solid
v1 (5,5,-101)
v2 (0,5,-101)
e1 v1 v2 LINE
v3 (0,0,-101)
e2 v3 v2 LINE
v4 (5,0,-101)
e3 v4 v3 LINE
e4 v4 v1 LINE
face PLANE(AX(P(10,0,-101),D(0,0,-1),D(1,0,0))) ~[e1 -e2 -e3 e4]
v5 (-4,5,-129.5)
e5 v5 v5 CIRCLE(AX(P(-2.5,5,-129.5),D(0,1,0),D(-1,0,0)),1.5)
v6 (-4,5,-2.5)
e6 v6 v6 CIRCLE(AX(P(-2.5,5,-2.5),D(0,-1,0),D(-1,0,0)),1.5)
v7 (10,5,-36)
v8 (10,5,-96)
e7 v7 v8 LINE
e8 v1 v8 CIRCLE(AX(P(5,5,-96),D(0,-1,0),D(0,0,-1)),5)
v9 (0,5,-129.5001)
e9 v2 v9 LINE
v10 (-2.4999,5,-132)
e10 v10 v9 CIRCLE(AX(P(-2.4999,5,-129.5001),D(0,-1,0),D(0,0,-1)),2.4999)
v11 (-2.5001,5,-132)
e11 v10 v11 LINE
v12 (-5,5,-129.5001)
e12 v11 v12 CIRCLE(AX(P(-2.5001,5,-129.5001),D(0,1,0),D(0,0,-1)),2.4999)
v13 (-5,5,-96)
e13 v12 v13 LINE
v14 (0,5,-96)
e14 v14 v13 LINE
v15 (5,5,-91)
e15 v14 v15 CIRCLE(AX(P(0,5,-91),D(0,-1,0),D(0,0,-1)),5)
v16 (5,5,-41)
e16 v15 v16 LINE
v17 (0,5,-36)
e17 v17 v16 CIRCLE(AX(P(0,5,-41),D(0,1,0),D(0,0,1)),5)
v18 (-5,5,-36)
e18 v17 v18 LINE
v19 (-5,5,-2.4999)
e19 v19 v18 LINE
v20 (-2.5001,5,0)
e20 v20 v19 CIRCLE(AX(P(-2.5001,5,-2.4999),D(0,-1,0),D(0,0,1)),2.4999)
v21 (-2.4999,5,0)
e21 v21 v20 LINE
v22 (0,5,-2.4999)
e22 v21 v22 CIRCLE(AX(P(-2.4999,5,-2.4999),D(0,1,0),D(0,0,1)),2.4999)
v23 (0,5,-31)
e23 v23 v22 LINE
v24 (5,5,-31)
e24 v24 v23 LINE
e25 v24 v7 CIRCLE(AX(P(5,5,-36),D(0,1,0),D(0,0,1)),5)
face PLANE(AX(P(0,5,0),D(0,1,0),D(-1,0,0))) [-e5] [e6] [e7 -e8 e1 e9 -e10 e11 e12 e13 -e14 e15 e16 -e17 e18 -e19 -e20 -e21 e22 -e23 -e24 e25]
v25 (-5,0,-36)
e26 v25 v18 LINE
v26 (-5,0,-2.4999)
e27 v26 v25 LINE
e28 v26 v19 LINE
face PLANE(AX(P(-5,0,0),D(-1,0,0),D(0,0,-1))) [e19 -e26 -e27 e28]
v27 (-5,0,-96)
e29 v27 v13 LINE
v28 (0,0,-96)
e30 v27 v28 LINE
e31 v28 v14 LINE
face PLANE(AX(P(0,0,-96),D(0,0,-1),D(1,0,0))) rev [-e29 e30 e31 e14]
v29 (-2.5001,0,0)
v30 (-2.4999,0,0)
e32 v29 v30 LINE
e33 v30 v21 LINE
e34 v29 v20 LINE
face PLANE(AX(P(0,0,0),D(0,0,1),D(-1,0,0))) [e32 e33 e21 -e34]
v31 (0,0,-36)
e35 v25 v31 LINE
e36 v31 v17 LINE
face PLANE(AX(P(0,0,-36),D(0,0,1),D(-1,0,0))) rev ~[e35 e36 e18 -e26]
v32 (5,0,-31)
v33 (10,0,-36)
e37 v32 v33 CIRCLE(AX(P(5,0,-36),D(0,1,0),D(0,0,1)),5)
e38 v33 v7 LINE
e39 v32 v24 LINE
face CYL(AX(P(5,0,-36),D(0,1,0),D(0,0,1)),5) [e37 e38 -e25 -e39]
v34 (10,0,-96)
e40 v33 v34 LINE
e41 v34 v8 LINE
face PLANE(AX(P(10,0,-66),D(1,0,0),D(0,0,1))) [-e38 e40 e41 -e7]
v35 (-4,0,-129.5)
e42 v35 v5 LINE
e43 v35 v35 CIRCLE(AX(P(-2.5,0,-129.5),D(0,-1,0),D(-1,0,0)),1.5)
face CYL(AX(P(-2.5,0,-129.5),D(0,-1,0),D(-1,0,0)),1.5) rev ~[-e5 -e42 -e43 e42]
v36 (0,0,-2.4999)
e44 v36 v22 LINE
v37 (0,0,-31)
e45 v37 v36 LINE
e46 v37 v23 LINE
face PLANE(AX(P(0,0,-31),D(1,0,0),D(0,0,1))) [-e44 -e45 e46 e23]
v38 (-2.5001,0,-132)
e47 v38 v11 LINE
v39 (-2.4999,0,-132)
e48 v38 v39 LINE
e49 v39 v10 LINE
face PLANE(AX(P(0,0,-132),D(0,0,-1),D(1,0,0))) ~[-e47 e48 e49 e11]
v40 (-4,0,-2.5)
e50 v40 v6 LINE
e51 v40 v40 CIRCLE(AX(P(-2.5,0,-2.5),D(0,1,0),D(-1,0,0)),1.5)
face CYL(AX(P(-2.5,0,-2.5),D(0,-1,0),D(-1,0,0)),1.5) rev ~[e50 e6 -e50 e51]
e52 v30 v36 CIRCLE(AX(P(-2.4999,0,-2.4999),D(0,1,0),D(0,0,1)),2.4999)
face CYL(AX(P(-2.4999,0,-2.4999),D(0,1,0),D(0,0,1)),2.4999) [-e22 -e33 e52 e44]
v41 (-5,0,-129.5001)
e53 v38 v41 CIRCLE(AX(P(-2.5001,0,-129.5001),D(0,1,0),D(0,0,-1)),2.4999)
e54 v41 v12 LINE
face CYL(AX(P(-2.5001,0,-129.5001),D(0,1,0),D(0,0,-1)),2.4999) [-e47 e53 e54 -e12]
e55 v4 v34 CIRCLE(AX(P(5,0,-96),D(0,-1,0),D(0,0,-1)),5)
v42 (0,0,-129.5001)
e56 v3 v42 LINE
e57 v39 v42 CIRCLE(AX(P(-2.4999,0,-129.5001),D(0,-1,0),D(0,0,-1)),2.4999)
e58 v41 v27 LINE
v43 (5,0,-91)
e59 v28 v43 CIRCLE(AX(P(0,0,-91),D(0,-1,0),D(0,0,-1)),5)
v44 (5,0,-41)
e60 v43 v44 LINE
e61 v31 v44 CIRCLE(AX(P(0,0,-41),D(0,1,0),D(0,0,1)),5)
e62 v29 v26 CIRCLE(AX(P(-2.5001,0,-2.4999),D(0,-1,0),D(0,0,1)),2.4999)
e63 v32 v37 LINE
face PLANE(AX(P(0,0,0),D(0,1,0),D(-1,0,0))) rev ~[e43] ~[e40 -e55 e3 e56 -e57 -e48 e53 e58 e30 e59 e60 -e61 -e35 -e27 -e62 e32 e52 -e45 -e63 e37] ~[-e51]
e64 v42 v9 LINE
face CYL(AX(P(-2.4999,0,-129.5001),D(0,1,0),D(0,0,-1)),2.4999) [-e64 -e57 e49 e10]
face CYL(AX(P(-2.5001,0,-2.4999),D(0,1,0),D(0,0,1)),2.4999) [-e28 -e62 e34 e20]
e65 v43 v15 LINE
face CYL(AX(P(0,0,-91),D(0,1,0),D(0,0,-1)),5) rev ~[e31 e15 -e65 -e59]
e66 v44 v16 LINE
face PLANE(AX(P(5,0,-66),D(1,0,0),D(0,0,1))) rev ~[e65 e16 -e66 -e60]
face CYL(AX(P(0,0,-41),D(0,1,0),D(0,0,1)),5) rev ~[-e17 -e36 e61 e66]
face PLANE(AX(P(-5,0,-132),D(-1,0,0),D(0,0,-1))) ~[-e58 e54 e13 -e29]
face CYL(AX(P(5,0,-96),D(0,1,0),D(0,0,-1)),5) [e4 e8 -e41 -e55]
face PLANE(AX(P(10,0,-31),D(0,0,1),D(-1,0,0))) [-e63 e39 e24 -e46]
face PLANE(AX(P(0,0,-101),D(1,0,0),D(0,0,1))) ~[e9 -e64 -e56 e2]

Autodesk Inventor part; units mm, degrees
ref_plane "YZ Plane" through (0, 0, 0) normal (1, 0, 0) x (0, 1, 0)
ref_plane "XZ Plane" through (0, 0, 0) normal (0, 1, 0) x (-1, 0, 0)
ref_plane "XY Plane" through (0, 0, 0) normal (0, 0, 1) x (1, 0, 0)
sketch "Эскиз1" plane through (0, 0, 0) normal (0, 1, 0) x (-1, 0, 0)
  line L0 (0, 0) -> (5, 0)
  line L1 (5, 0) -> (5, -66)
  line L2 (5, -66) -> (0, -66)
  line L3 (0, -66) -> (0, 0)
  line L4 (2.5, 0) -> (2.5, -2.5)
  circle A0 centre (2.5, -2.5) radius 1.5
  line L5 (0, -66) -> (-10, -66)
  line L6 (-10, -66) -> (-10, -31)
  line L7 (-10, -31) -> (0, -31)
  line L8 (0, -31) -> (0, -66)
  line L9 (5, -66) -> (0, -66)
  line L10 (5, -66) -> (-5, -66)
  line L11 (-5, -66) -> (-5, -36)
  line L12 (-5, -36) -> (5, -36)
  line L13 (5, -36) -> (5, -66)
  point P0 (0, -31)
  point P1 (0, -36)
  point P2 (5, -36)
  dimension "d0" = 5
  dimension "d1" = 66
  dimension "d4" = 2.5
  dimension "d5" = 3
  dimension "d7" = 10
  dimension "d8" = 35
  dimension "d11" = 10
  dimension "d12" = 30
extrude "Выдавливание1" add sketch "Эскиз1" along normal blind 5 contours L0 L1 L12 L3 | L3 L12 L11 L5 L6 L7
fillet "Сопряжение1" radius 2.5 2 edges at (0, 2.5, 0) (-5, 2.5, 0)
fillet "Сопряжение2" radius 5 2 edges at (10, 2.5, -31) (5, 2.5, -36)
mirror "Зеркальное отражение2" about plane through (10, 0, -66) normal (0, 0, -1)
equation "\"d11\" = d7"
equation "\"d12\" = d8 - d0"
properties part number "Балка рулевого управления"
